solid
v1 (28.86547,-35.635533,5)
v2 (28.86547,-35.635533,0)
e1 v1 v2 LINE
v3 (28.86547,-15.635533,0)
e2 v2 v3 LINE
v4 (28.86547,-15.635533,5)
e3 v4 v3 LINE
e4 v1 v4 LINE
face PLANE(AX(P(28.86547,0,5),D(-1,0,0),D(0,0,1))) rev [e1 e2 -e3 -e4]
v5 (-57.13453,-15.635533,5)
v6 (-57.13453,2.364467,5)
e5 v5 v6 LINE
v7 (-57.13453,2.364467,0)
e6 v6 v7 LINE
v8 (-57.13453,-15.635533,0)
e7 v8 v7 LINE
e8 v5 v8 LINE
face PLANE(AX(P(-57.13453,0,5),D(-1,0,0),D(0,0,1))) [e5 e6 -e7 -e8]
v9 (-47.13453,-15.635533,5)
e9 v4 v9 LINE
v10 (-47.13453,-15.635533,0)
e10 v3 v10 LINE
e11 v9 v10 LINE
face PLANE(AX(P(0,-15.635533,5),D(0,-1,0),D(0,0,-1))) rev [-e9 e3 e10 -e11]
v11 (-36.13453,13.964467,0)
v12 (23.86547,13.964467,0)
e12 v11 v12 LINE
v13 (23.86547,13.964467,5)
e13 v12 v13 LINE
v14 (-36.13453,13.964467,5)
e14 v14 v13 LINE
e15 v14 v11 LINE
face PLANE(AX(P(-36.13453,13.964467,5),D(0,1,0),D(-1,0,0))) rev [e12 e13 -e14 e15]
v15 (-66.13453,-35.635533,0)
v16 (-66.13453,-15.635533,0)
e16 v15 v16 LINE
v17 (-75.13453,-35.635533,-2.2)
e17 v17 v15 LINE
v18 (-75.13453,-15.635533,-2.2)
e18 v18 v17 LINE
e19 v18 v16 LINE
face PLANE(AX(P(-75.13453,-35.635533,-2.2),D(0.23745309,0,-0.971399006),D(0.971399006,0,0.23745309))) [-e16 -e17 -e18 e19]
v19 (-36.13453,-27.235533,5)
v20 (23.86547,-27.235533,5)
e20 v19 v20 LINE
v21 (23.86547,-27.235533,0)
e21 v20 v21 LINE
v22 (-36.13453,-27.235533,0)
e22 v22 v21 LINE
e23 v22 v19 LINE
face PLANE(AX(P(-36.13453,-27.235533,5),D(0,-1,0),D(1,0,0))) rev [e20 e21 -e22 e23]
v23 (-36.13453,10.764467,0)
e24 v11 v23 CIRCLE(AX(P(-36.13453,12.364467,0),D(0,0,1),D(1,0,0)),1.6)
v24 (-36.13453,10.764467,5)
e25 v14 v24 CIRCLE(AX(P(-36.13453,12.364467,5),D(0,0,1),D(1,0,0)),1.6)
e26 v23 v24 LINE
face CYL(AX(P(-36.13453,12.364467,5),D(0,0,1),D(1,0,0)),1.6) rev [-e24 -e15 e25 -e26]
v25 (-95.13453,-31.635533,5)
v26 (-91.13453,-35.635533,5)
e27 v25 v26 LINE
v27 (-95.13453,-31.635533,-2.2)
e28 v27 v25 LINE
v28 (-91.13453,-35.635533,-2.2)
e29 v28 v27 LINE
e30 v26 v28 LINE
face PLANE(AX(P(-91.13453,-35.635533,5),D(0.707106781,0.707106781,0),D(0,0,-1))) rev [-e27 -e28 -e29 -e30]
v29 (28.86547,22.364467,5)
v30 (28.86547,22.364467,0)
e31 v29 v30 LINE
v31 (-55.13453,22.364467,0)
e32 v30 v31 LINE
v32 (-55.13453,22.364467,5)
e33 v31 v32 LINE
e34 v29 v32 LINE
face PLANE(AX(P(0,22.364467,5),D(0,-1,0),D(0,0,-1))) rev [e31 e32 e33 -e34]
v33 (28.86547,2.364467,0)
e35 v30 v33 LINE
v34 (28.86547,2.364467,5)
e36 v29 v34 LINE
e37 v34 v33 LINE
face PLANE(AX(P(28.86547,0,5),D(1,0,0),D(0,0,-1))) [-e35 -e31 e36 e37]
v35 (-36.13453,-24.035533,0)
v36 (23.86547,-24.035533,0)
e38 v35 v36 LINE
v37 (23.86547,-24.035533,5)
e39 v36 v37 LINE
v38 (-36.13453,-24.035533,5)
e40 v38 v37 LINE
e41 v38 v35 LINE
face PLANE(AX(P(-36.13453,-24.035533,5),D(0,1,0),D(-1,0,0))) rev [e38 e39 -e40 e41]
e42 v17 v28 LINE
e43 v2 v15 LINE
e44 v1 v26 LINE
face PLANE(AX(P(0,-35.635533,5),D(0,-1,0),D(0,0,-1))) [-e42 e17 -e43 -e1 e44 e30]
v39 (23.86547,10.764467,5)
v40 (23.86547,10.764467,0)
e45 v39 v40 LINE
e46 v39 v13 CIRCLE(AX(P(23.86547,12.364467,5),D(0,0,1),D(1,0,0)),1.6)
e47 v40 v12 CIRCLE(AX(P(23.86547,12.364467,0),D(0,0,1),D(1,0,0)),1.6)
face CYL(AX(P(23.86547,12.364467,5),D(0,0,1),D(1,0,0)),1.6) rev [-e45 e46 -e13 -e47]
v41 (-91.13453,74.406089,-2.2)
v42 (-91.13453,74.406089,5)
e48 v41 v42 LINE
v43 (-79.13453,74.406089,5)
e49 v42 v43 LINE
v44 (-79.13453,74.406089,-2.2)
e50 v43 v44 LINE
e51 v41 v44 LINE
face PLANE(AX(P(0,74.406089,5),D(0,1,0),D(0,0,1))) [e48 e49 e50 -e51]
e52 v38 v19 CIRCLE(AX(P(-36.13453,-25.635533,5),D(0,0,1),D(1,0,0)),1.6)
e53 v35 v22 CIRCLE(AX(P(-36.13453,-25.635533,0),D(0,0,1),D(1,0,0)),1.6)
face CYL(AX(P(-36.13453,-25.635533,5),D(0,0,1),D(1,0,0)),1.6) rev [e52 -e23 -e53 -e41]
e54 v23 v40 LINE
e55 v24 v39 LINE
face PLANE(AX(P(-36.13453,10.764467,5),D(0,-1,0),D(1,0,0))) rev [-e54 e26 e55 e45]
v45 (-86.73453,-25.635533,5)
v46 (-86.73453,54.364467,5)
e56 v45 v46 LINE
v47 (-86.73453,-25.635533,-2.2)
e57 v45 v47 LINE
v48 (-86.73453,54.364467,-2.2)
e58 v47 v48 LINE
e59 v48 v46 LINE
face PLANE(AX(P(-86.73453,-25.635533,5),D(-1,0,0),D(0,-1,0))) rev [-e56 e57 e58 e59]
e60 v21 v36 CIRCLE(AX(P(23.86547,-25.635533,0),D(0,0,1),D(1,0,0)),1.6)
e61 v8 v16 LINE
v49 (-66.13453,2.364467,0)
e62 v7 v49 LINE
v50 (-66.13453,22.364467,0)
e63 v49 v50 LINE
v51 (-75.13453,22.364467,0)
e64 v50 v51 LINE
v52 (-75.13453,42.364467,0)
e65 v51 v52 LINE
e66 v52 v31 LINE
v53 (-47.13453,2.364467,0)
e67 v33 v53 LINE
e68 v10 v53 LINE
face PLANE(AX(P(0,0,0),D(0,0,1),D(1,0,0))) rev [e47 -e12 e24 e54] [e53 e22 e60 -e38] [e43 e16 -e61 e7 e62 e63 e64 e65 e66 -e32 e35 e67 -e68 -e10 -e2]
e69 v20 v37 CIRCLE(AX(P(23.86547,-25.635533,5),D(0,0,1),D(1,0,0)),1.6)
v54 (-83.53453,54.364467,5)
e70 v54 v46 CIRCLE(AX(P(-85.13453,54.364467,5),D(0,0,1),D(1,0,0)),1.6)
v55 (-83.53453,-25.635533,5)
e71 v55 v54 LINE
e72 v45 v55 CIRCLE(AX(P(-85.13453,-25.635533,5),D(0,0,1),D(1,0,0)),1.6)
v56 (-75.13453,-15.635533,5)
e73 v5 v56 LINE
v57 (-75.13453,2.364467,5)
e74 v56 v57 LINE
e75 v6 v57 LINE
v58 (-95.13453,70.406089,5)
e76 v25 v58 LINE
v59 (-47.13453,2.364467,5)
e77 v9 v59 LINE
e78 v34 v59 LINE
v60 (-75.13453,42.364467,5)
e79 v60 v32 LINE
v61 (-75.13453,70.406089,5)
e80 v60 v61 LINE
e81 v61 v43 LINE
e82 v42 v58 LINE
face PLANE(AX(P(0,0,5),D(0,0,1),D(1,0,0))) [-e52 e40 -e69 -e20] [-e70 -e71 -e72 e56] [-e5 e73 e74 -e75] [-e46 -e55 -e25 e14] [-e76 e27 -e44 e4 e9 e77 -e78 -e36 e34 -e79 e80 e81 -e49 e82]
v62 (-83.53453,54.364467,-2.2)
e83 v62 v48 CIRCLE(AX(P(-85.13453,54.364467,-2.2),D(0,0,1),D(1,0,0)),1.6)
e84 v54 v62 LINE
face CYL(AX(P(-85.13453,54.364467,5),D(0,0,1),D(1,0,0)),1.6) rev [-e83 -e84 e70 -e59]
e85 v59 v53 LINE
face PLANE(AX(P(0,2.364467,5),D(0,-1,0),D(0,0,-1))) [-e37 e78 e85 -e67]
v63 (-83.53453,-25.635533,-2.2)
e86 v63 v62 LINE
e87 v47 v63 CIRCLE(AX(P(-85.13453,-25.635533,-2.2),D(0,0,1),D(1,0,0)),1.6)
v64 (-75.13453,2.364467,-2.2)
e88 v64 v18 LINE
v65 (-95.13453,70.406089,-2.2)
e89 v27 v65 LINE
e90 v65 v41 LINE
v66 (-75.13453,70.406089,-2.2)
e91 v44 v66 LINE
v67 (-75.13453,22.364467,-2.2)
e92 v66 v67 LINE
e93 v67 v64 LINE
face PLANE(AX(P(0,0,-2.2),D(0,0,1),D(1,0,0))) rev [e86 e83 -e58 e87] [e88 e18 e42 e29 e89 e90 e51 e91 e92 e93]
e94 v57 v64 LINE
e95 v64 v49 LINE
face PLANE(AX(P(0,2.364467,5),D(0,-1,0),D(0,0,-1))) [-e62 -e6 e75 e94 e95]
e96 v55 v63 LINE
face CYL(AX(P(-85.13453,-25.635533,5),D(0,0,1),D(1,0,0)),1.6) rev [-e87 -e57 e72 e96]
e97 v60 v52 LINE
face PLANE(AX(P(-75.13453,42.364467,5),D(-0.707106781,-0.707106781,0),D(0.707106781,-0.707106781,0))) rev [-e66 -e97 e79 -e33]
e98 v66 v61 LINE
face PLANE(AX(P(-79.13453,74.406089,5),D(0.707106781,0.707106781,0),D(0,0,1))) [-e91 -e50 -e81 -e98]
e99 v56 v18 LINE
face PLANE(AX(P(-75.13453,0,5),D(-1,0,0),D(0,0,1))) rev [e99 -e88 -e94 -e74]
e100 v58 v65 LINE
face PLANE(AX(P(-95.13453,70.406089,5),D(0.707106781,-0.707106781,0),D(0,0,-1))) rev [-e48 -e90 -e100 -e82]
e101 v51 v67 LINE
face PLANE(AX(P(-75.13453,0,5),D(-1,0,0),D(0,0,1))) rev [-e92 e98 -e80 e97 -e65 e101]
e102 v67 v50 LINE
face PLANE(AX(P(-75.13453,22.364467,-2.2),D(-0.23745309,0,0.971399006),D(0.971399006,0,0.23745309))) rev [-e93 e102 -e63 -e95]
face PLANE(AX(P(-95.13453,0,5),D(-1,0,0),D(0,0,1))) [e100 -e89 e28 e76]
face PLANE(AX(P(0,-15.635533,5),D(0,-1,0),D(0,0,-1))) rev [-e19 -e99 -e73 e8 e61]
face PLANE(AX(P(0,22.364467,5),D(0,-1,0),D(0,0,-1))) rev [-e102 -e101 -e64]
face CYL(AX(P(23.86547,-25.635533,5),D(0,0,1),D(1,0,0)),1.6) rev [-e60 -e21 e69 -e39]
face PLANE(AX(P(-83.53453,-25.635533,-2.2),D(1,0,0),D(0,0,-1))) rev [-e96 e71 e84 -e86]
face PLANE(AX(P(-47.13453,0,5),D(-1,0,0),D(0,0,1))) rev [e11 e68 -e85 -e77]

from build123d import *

# Parameters (mm, degrees)
SKETCH_1_W                  = 76
SKETCH_1_H                  = 20
SKETCH_1_W_2                = 18
SKETCH_1_W_3                = 10
SKETCH_1_H_2                = 18
SKETCH_1_W_4                = 20
SKETCH_1_H_3                = 52.041621827
EXTRUDE_1_DEPTH             = 5
HOLE_WIZARD_3_2_3_2_1_DEPTH = 5
SKETCH_8_W                  = 20
SKETCH_8_H                  = 110.041621827
EXTRUDE_2_DEPTH             = 2.2
HOLE_START                  = -2.2
HOLE_WIZARD_3_2_3_2_3_DEPTH = 7.2
RIB_1_REACH                 = 147.55
SKETCH_11_WALL_W            = 302.364540162
SKETCH_11_WALL_H            = 20
RIB_2_REACH                 = 113.533
SKETCH_12_WALL_W            = 234.330707354
SKETCH_12_WALL_H            = 20
RIB_3_REACH                 = 122.99
SKETCH_13_WALL_W            = 272.265137078
SKETCH_13_WALL_H            = 5
CHAMFER_1_SIZE              = 4


# Read off the part's stored shape, not the designer's step: Ø3.2 (3.2) 直径槽口1, Ø3.2 (3.2) 直径槽口3
with BuildPart() as part:
    # 草图1 → 凸台-拉伸1 (new body)
    with BuildSketch(Plane.XY):
        with Locations((-9.134530028, -25.635533007)):
            Rectangle(SKETCH_1_W, SKETCH_1_H)
        with Locations((-66.134530028, -25.635533007)):
            Rectangle(SKETCH_1_W_2, SKETCH_1_H)
        with Locations((-52.134530028, -25.635533007)):
            Rectangle(SKETCH_1_W_3, SKETCH_1_H)
        with Locations((-66.134530028, 12.364466993)):
            Rectangle(SKETCH_1_W_2, SKETCH_1_H)
        with Locations((-9.134530028, 12.364466993)):
            Rectangle(SKETCH_1_W, SKETCH_1_H)
        with Locations((-52.134530028, 12.364466993)):
            Rectangle(SKETCH_1_W_3, SKETCH_1_H)
        with Locations((-52.134530028, -6.635533007)):
            Rectangle(SKETCH_1_W_3, SKETCH_1_H_2)
        with Locations((-85.134530028, 12.364466993)):
            Rectangle(SKETCH_1_W_4, SKETCH_1_H)
        with Locations((-85.134530028, -6.635533007)):
            Rectangle(SKETCH_1_W_4, SKETCH_1_H_2)
        with Locations((-85.134530028, -25.635533007)):
            Rectangle(SKETCH_1_W_4, SKETCH_1_H)
        with Locations((-85.134530028, 48.385277907)):
            Rectangle(SKETCH_1_W_4, SKETCH_1_H_3)
    extrude(amount=EXTRUDE_1_DEPTH)

    # Ø3.2 (3.2) 直径槽口1 outline → Ø3.2 (3.2) 直径槽口1 (cut)
    with BuildSketch(Plane.XY):
        with BuildLine():
            Line((-36.134530028, 10.764466993), (23.865469972, 10.764466993))
            ThreePointArc((23.865469972, 10.764466993), (25.465469972, 12.364466993), (23.865469972, 13.964466993))
            Line((23.865469972, 13.964466993), (-36.134530028, 13.964466993))
            ThreePointArc((-36.134530028, 13.964466993), (-37.734530028, 12.364466993), (-36.134530028, 10.764466993))
        make_face()
        with BuildLine():
            Line((-36.134530028, -27.235533007), (23.865469972, -27.235533007))
            ThreePointArc((23.865469972, -27.235533007), (25.465469972, -25.635533007), (23.865469972, -24.035533007))
            Line((23.865469972, -24.035533007), (-36.134530028, -24.035533007))
            ThreePointArc((-36.134530028, -24.035533007), (-37.734530028, -25.635533007), (-36.134530028, -27.235533007))
        make_face()
    extrude(amount=HOLE_WIZARD_3_2_3_2_1_DEPTH, mode=Mode.SUBTRACT)

    # 草图8 → 凸台-拉伸2 (add)
    with BuildSketch(Plane(origin=(0, 0, 0), x_dir=(-1, 0, 0), z_dir=(0, 0, -1))):
        with Locations((85.134530028, 19.385277907)):
            Rectangle(SKETCH_8_W, SKETCH_8_H)
    extrude(amount=EXTRUDE_2_DEPTH)

    # Ø3.2 (3.2) 直径槽口3 outline → Ø3.2 (3.2) 直径槽口3 (cut)
    with BuildSketch(Plane.XY.offset(HOLE_START)):
        with BuildLine():
            Line((-83.534530028, -25.635533007), (-83.534530028, 54.364466993))
            ThreePointArc((-83.534530028, 54.364466993), (-85.134530028, 55.964466993), (-86.734530028, 54.364466993))
            Line((-86.734530028, 54.364466993), (-86.734530028, -25.635533007))
            ThreePointArc((-86.734530028, -25.635533007), (-85.134530028, -27.235533007), (-83.534530028, -25.635533007))
        make_face()
    extrude(amount=HOLE_WIZARD_3_2_3_2_3_DEPTH, mode=Mode.SUBTRACT)

    # 草图11 wall → 筋1 (add, up to next)
    with BuildSketch(Plane(origin=(-70.634530028, -35.635533007, -1.1), x_dir=(0.971399006497, 0, 0.237453090477), z_dir=(-0.237453090477, 0, 0.971399006497)), mode=Mode.PRIVATE) as rib_1_sk1:
        with Locations((0, 10)):
            Rectangle(SKETCH_11_WALL_W, SKETCH_11_WALL_H)
    rib_1_tool1 = extrude(rib_1_sk1.sketch, amount=RIB_1_REACH, mode=Mode.PRIVATE) - part.part
    add(rib_1_tool1.solids().sort_by_distance((-70.634530028, -35.635533007, -1.1))[0])

    # 草图12 wall → 筋2 (add, up to next)
    with BuildSketch(Plane(origin=(-70.634530028, 22.364466993, -1.1), x_dir=(0.971399006497, 0, 0.237453090477), z_dir=(0.237453090477, 0, -0.971399006497)), mode=Mode.PRIVATE) as rib_2_sk1:
        with Locations((0, 10)):
            Rectangle(SKETCH_12_WALL_W, SKETCH_12_WALL_H)
    rib_2_tool1 = extrude(rib_2_sk1.sketch, amount=-RIB_2_REACH, mode=Mode.PRIVATE) - part.part
    add(rib_2_tool1.solids().sort_by_distance((-70.634530028, 22.364466993, -1.1))[0])

    # 草图13 wall → 筋3 (add, up to next)
    with BuildSketch(Plane(origin=(-65.134530028, 32.364466993, 5), x_dir=(0.707106781187, -0.707106781187, 0), z_dir=(0.707106781187, 0.707106781187, 0)), mode=Mode.PRIVATE) as rib_3_sk1:
        with Locations((0, 2.5)):
            Rectangle(SKETCH_13_WALL_W, SKETCH_13_WALL_H)
    rib_3_tool1 = extrude(rib_3_sk1.sketch, amount=-RIB_3_REACH, mode=Mode.PRIVATE) - part.part
    add(rib_3_tool1.solids().sort_by_distance((-65.134530028, 32.364466993, 5))[0])

    # 倒角1
    chamfer_1_edges = [part.edges().sort_by_distance(p)[0] for p in [
        (-75.134530028, 74.40608882, 1.4),
        (-95.134530028, -35.635533007, 1.4),
        (-95.134530028, 74.40608882, 1.4),
    ]]
    chamfer(chamfer_1_edges, length=CHAMFER_1_SIZE)


solid = part.part
